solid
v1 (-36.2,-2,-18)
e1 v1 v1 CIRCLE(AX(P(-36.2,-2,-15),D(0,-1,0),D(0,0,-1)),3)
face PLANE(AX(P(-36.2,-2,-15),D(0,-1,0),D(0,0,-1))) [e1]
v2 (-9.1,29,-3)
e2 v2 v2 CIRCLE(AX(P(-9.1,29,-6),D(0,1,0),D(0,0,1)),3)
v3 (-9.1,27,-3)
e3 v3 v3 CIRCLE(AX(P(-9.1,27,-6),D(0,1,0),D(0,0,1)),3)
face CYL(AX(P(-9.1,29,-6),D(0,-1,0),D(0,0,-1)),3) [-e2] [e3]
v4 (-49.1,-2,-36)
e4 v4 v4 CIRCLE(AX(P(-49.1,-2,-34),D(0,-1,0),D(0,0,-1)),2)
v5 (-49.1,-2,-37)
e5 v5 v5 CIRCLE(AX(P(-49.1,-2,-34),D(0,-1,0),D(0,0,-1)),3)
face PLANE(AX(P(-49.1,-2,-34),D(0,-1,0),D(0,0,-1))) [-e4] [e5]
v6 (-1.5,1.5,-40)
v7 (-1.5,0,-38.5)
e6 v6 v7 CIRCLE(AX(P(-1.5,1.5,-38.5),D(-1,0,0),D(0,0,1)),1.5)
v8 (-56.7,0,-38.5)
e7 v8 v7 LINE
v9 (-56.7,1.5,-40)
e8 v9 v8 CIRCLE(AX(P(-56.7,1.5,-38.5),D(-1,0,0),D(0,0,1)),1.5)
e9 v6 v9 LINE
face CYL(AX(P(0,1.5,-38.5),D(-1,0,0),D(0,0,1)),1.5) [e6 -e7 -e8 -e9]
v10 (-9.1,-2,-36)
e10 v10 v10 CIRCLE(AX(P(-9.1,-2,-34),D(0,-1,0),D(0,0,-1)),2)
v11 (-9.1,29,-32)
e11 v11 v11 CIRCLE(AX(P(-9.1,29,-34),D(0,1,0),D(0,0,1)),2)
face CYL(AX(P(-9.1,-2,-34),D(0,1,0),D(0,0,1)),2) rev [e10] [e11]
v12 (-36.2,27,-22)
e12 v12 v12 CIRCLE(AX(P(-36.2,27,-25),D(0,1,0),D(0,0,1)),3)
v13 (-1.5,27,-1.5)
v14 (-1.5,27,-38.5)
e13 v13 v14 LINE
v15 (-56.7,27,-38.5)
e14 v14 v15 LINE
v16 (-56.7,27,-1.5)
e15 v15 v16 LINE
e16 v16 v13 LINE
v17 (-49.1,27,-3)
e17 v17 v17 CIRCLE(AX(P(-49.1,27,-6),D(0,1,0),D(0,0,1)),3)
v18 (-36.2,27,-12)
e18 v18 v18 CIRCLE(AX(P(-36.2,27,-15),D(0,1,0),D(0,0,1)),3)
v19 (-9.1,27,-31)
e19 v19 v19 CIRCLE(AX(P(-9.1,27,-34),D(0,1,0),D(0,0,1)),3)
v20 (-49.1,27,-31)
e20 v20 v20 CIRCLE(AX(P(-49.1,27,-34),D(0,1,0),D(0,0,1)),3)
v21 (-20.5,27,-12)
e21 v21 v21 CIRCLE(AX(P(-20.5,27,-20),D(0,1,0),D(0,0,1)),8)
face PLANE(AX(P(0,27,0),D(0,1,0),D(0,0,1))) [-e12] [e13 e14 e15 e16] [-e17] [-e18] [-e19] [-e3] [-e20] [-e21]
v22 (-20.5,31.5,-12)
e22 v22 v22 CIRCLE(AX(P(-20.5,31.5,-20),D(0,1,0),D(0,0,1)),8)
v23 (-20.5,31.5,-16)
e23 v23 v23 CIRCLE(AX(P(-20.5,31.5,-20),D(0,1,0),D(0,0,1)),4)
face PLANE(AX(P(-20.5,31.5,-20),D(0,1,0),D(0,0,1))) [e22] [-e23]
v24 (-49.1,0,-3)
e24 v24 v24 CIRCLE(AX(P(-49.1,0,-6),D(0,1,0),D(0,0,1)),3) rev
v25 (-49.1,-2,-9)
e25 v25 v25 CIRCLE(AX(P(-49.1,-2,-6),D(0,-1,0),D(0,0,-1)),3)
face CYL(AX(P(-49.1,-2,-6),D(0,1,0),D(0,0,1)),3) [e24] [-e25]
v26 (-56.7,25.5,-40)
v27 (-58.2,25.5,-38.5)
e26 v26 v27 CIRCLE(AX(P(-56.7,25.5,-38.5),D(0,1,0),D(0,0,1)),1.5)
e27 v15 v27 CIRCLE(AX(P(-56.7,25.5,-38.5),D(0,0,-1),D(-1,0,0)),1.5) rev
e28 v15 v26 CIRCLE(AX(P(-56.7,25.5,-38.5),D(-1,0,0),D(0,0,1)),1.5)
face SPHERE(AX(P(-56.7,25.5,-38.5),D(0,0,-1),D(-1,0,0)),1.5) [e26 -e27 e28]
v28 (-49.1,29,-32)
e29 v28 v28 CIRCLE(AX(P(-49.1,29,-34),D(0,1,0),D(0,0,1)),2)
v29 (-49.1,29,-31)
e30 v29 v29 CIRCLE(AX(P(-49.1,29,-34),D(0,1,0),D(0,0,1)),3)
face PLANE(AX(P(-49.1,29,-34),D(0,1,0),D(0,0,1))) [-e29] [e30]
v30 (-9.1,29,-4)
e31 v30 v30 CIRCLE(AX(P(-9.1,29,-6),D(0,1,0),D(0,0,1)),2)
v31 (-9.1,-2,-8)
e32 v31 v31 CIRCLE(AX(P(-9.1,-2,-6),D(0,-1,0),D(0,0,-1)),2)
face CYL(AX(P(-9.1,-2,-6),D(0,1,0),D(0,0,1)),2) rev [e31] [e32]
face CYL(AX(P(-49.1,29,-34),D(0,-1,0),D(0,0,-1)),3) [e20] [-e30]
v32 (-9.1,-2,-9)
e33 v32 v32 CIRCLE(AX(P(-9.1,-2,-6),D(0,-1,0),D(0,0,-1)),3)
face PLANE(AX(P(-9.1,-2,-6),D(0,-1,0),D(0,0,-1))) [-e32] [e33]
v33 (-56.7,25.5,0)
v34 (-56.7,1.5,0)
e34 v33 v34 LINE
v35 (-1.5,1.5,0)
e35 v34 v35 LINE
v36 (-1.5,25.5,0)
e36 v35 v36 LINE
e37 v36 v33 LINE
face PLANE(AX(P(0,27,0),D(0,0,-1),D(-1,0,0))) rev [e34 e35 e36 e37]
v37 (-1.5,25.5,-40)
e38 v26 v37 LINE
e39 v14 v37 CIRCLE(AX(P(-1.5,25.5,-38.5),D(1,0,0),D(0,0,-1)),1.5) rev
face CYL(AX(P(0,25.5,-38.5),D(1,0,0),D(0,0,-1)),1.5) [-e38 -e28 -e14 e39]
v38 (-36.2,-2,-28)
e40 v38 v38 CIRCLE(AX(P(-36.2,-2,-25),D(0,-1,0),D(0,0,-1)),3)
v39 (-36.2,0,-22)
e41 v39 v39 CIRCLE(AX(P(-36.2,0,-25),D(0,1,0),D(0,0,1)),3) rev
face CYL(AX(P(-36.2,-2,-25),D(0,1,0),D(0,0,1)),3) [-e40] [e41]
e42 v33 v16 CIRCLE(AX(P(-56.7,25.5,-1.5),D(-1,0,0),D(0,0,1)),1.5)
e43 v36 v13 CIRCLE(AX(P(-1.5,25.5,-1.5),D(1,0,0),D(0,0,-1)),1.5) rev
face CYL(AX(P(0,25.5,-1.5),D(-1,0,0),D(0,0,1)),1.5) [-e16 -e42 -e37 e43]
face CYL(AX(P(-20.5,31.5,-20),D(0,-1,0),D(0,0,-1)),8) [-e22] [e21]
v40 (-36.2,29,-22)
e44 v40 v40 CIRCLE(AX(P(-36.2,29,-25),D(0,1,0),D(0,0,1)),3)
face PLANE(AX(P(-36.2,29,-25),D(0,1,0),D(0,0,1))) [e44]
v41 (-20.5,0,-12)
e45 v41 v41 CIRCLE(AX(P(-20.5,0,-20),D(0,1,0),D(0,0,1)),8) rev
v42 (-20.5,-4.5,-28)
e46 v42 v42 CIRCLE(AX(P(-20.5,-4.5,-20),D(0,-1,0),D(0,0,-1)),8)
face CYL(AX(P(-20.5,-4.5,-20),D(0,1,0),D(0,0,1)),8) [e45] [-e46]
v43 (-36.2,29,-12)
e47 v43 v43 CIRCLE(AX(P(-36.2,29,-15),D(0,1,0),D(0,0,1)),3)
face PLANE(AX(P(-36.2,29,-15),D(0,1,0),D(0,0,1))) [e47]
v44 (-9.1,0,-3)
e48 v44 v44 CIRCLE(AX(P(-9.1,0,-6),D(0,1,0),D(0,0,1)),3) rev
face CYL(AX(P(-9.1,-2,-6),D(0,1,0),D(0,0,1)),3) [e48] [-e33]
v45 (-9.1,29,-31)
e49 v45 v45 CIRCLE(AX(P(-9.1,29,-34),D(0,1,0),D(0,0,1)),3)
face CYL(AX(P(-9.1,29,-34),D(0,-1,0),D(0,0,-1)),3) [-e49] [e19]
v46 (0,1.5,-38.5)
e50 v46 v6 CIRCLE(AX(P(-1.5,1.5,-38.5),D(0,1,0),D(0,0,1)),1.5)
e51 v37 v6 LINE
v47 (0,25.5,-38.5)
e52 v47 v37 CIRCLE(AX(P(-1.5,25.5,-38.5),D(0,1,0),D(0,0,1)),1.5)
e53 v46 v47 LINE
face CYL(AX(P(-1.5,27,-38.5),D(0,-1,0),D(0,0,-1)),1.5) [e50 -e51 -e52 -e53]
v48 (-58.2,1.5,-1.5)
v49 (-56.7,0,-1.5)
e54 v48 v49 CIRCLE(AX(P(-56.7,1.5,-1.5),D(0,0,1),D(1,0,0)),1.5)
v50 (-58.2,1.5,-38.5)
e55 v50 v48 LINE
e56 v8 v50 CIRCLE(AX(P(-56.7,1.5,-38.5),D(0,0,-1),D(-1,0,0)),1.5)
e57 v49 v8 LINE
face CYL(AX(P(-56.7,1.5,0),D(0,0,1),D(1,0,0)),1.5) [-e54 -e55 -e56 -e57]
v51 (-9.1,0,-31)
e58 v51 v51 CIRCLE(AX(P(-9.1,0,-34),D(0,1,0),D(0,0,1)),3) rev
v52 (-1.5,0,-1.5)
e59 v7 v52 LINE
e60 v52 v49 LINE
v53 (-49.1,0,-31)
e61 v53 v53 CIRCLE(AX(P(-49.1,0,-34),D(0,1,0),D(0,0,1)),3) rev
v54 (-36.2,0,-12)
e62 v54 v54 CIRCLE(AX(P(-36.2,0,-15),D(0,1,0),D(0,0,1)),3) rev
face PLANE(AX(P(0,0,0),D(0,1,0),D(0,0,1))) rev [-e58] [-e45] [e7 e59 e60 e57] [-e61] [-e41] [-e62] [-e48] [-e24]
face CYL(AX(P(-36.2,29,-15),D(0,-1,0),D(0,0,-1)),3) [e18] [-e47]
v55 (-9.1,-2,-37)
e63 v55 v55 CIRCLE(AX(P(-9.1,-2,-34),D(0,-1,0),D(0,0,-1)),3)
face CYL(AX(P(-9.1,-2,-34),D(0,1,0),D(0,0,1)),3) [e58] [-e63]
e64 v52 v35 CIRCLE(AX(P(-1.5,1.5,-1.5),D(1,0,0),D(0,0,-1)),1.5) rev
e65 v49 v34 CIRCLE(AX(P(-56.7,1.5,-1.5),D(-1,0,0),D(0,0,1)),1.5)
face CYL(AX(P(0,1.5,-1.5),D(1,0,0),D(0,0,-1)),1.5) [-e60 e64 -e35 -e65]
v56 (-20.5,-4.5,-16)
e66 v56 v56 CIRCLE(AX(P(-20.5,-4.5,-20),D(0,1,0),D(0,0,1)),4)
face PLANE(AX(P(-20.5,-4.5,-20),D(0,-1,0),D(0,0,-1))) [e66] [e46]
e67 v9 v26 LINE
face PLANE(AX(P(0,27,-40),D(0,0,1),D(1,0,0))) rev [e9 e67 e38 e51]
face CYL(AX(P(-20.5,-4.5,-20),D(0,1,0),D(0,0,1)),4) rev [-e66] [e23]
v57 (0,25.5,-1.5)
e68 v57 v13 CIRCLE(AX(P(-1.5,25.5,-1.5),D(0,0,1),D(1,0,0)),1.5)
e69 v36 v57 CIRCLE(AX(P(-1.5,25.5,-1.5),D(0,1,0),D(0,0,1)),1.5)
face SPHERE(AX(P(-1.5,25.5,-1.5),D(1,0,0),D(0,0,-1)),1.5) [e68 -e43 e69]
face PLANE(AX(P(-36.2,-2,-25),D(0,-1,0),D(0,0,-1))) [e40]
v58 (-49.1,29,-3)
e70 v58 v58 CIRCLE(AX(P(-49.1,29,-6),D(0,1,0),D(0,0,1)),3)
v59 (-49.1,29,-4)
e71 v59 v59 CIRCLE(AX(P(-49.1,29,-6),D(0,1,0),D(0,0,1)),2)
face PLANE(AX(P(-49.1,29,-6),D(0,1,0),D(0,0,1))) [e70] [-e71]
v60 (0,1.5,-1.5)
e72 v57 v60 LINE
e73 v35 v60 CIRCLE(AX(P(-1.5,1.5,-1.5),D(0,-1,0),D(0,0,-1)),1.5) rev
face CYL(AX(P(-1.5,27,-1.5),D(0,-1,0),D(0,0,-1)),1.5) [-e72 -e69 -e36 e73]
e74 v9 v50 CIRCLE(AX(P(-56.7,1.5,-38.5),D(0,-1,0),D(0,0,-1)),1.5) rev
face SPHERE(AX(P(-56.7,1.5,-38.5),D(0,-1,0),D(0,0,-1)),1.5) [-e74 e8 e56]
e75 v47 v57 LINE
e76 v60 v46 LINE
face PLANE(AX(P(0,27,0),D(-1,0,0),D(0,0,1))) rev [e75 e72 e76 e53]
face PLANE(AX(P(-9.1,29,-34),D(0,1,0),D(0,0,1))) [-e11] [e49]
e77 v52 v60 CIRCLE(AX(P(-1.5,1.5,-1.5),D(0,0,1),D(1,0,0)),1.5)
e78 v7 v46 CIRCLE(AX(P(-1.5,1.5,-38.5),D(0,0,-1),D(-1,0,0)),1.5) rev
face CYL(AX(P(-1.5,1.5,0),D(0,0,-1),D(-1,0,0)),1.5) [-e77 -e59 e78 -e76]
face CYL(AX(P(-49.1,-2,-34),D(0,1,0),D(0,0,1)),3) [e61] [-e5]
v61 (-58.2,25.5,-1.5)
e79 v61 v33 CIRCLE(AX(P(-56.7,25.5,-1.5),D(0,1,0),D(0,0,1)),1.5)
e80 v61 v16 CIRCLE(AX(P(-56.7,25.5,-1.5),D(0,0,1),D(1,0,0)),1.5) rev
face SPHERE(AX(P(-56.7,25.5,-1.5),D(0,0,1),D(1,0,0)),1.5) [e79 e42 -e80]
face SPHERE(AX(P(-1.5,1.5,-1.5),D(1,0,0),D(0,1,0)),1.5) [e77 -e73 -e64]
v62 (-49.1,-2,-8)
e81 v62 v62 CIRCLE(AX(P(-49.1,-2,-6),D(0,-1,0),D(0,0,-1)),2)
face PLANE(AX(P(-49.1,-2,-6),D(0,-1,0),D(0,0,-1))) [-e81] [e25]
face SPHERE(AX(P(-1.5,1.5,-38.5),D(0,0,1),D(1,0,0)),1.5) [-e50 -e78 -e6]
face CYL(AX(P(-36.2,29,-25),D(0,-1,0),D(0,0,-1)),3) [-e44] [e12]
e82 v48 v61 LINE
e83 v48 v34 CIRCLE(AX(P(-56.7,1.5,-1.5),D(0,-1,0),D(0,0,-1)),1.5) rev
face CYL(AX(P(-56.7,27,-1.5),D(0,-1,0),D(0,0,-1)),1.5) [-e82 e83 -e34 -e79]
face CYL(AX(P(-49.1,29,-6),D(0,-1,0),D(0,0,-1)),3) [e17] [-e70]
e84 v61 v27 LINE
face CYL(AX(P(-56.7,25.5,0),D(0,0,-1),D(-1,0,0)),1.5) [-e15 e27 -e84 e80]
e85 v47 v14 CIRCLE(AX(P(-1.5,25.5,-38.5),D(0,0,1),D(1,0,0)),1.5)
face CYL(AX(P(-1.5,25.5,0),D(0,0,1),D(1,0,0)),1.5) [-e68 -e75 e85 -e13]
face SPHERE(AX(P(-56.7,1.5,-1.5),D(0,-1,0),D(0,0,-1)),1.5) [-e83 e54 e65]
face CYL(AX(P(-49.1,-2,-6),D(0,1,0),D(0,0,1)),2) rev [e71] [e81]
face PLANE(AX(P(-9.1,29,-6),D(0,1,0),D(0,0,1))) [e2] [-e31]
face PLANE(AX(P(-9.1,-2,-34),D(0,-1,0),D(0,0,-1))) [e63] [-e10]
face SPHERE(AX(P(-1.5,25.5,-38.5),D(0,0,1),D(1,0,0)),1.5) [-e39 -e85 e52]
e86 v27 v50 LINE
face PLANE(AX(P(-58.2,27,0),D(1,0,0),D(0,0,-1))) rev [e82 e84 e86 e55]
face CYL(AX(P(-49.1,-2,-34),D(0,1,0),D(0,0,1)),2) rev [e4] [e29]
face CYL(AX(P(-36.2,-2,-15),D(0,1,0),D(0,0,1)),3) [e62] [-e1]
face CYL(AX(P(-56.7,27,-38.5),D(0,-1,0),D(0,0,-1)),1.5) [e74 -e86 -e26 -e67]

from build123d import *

# Parameters (mm, degrees)
SKETCH1_W            = 58.2
SKETCH1_H            = 40
BOSS_EXTRUDE1_DEPTH  = 27
SKETCH2_R            = 3
BOSS_EXTRUDE2_DEPTH  = 2
SKETCH3_R            = 2
CUT_EXTRUDE1_DEPTH   = 31
SKETCH4_R            = 3
BOSS_EXTRUDE3_DEPTH  = 2
SKETCH5_R            = 2
CUT_EXTRUDE2_DEPTH   = 31
SKETCH6_R            = 3
BOSS_EXTRUDE4_DEPTH  = 2
SKETCH7_R            = 2
CUT_EXTRUDE3_DEPTH   = 31
SKETCH8_R            = 3
BOSS_EXTRUDE5_DEPTH  = 2
SKETCH9_R            = 2
CUT_EXTRUDE4_DEPTH   = 31
SKETCH10_R           = 8
BOSS_EXTRUDE6_DEPTH  = 4.5
SKETCH11_R           = 4
CUT_EXTRUDE5_DEPTH   = 36
BOSS_EXTRUDE7_START  = 2
SKETCH12_R           = 3
BOSS_EXTRUDE7_DEPTH  = 2
BOSS_EXTRUDE8_START  = 2
SKETCH13_R           = 3
BOSS_EXTRUDE8_DEPTH  = 2
BOSS_EXTRUDE9_START  = 4.5
SKETCH15_R           = 8
BOSS_EXTRUDE9_DEPTH  = 4.5
SKETCH18_R           = 2
CUT_EXTRUDE11_DEPTH  = 78.32716211
SKETCH19_R           = 4
CUT_EXTRUDE12_DEPTH  = 78.32716211
SKETCH20_R           = 2
CUT_EXTRUDE13_DEPTH  = 78.32716211
SKETCH24_R           = 3
BOSS_EXTRUDE11_DEPTH = 2
SKETCH25_R           = 3
BOSS_EXTRUDE12_DEPTH = 2
BOSS_EXTRUDE13_START = 2
SKETCH26_R           = 3
BOSS_EXTRUDE13_DEPTH = 2
BOSS_EXTRUDE14_START = 2
SKETCH27_R           = 3
BOSS_EXTRUDE14_DEPTH = 2
FILLET5_R            = 1.5
FILLET6_R            = 1.5


with BuildPart() as part:
    # Sketch1 → Boss-Extrude1 (new body)
    with BuildSketch(Plane(origin=(0, 0, 0), x_dir=(1, 0, 0), z_dir=(0, 1, 0))):
        with Locations((-29.1, 20)):
            Rectangle(SKETCH1_W, SKETCH1_H)
    extrude(amount=BOSS_EXTRUDE1_DEPTH)

    # Sketch2 → Boss-Extrude2 (add)
    with BuildSketch(Plane(origin=(0, 27, 0), x_dir=(1, 0, 0), z_dir=(0, 1, 0))):
        with Locations(Location((-49.1, 34, 0), (0, 0, 270))):
            Circle(SKETCH2_R)
    extrude(amount=BOSS_EXTRUDE2_DEPTH)

    # Sketch3 → Cut-Extrude1 (cut)
    with BuildSketch(Plane(origin=(0, 29, 0), x_dir=(1, 0, 0), z_dir=(0, 1, 0))):
        with Locations(Location((-49.1, 34, 0), (0, 0, 270))):
            Circle(SKETCH3_R)
    extrude(amount=-CUT_EXTRUDE1_DEPTH, mode=Mode.SUBTRACT)

    # Sketch4 → Boss-Extrude3 (add)
    with BuildSketch(Plane(origin=(0, 27, 0), x_dir=(1, 0, 0), z_dir=(0, 1, 0))):
        with Locations(Location((-9.1, 34, 0), (0, 0, 270))):
            Circle(SKETCH4_R)
    extrude(amount=BOSS_EXTRUDE3_DEPTH)

    # Sketch5 → Cut-Extrude2 (cut)
    with BuildSketch(Plane(origin=(0, 29, 0), x_dir=(1, 0, 0), z_dir=(0, 1, 0))):
        with Locations(Location((-9.1, 34, 0), (0, 0, 270))):
            Circle(SKETCH5_R)
    extrude(amount=-CUT_EXTRUDE2_DEPTH, mode=Mode.SUBTRACT)

    # Sketch6 → Boss-Extrude4 (add)
    with BuildSketch(Plane(origin=(0, 27, 0), x_dir=(1, 0, 0), z_dir=(0, 1, 0))):
        with Locations(Location((-49.1, 6, 0), (0, 0, 270))):
            Circle(SKETCH6_R)
    extrude(amount=BOSS_EXTRUDE4_DEPTH)

    # Sketch7 → Cut-Extrude3 (cut)
    with BuildSketch(Plane(origin=(0, 29, 0), x_dir=(1, 0, 0), z_dir=(0, 1, 0))):
        with Locations(Location((-49.1, 6, 0), (0, 0, 270))):
            Circle(SKETCH7_R)
    extrude(amount=-CUT_EXTRUDE3_DEPTH, mode=Mode.SUBTRACT)

    # Sketch8 → Boss-Extrude5 (add)
    with BuildSketch(Plane(origin=(0, 27, 0), x_dir=(1, 0, 0), z_dir=(0, 1, 0))):
        with Locations(Location((-9.1, 6, 0), (0, 0, 270))):
            Circle(SKETCH8_R)
    extrude(amount=BOSS_EXTRUDE5_DEPTH)

    # Sketch9 → Cut-Extrude4 (cut)
    with BuildSketch(Plane(origin=(0, 29, 0), x_dir=(1, 0, 0), z_dir=(0, 1, 0))):
        with Locations(Location((-9.1, 6, 0), (0, 0, 270))):
            Circle(SKETCH9_R)
    extrude(amount=-CUT_EXTRUDE4_DEPTH, mode=Mode.SUBTRACT)

    # Sketch10 → Boss-Extrude6 (add)
    with BuildSketch(Plane(origin=(0, 27, 0), x_dir=(1, 0, 0), z_dir=(0, 1, 0))):
        with Locations(Location((-20.5, 20, 0), (0, 0, 270))):
            Circle(SKETCH10_R)
    extrude(amount=BOSS_EXTRUDE6_DEPTH)

    # Sketch11 → Cut-Extrude5 (cut)
    with BuildSketch(Plane(origin=(0, 31.5, 0), x_dir=(1, 0, 0), z_dir=(0, 1, 0))):
        with Locations(Location((-20.5, 20, 0), (0, 0, 270))):
            Circle(SKETCH11_R)
    extrude(amount=-CUT_EXTRUDE5_DEPTH, mode=Mode.SUBTRACT)

    # Sketch12 → Boss-Extrude7 (add)
    with BuildSketch(Plane.XZ.offset(BOSS_EXTRUDE7_START)):
        with Locations(Location((-49.1, -6, 0), (0, 0, 90))):
            Circle(SKETCH12_R)
    extrude(amount=-BOSS_EXTRUDE7_DEPTH)

    # Sketch13 → Boss-Extrude8 (add)
    with BuildSketch(Plane.XZ.offset(BOSS_EXTRUDE8_START)):
        with Locations(Location((-49.1, -34, 0), (0, 0, 90))):
            Circle(SKETCH13_R)
        with Locations(Location((-9.1, -6, 0), (0, 0, 90))):
            Circle(SKETCH13_R)
        with Locations(Location((-9.1, -34, 0), (0, 0, 90))):
            Circle(SKETCH13_R)
    extrude(amount=-BOSS_EXTRUDE8_DEPTH)

    # Sketch15 → Boss-Extrude9 (add)
    with BuildSketch(Plane.XZ.offset(BOSS_EXTRUDE9_START)):
        with Locations(Location((-20.5, -20, 0), (0, 0, 90))):
            Circle(SKETCH15_R)
    extrude(amount=-BOSS_EXTRUDE9_DEPTH)

    # Sketch18 → Cut-Extrude11 (cut, through all)
    with BuildSketch(Plane(origin=(0, 0, 0), x_dir=(1, 0, 0), z_dir=(0, 1, 0))):
        with Locations(Location((-9.1, 6, 0), (0, 0, 270))):
            Circle(SKETCH18_R)
    extrude(amount=-CUT_EXTRUDE11_DEPTH, mode=Mode.SUBTRACT)

    # Sketch19 → Cut-Extrude12 (cut, through all)
    with BuildSketch(Plane(origin=(0, 0, 0), x_dir=(1, 0, 0), z_dir=(0, 1, 0))):
        with Locations(Location((-20.5, 20, 0), (0, 0, 270))):
            Circle(SKETCH19_R)
    extrude(amount=-CUT_EXTRUDE12_DEPTH, mode=Mode.SUBTRACT)

    # Sketch20 → Cut-Extrude13 (cut, through all)
    with BuildSketch(Plane(origin=(0, 0, 0), x_dir=(1, 0, 0), z_dir=(0, 1, 0))):
        with Locations(Location((-49.1, 34, 0), (0, 0, 270))):
            Circle(SKETCH20_R)
        with Locations(Location((-49.1, 6, 0), (0, 0, 270))):
            Circle(SKETCH20_R)
        with Locations(Location((-9.1, 34, 0), (0, 0, 270))):
            Circle(SKETCH20_R)
    extrude(amount=-CUT_EXTRUDE13_DEPTH, mode=Mode.SUBTRACT)

    # Sketch24 → Boss-Extrude11 (add)
    with BuildSketch(Plane(origin=(0, 27, 0), x_dir=(1, 0, 0), z_dir=(0, 1, 0))):
        with Locations(Location((-36.2, 15, 0), (0, 0, 270))):
            Circle(SKETCH24_R)
    extrude(amount=BOSS_EXTRUDE11_DEPTH)

    # Sketch25 → Boss-Extrude12 (add)
    with BuildSketch(Plane(origin=(0, 27, 0), x_dir=(1, 0, 0), z_dir=(0, 1, 0))):
        with Locations(Location((-36.2, 25, 0), (0, 0, 270))):
            Circle(SKETCH25_R)
    extrude(amount=BOSS_EXTRUDE12_DEPTH)

    # Sketch26 → Boss-Extrude13 (add)
    with BuildSketch(Plane.XZ.offset(BOSS_EXTRUDE13_START)):
        with Locations(Location((-36.2, -15, 0), (0, 0, 90))):
            Circle(SKETCH26_R)
    extrude(amount=-BOSS_EXTRUDE13_DEPTH)

    # Sketch27 → Boss-Extrude14 (add)
    with BuildSketch(Plane.XZ.offset(BOSS_EXTRUDE14_START)):
        with Locations(Location((-36.2, -25, 0), (0, 0, 90))):
            Circle(SKETCH27_R)
    extrude(amount=-BOSS_EXTRUDE14_DEPTH)

    # Fillet5
    fillet5_edges = [part.edges().sort_by_distance(p)[0] for p in [
        (-58.2, 27, -20),
        (-29.1, 27, 0),
        (0, 27, -20),
        (-29.1, 0, 0),
        (-58.2, 0, -20),
        (-29.1, 0, -40),
        (0, 0, -20),
        (0, 13.5, 0),
        (-58.2, 13.5, 0),
        (-58.2, 13.5, -40),
        (-29.1, 27, -40),
    ]]
    fillet(fillet5_edges, radius=FILLET5_R)

    # Fillet6
    # the kernel refuses this fillet: 1.5 mm, written as the material it takes off along each edge
    with BuildSketch(Plane(origin=(-1.5, 1.5, -38.5), x_dir=(0, 0, -1), z_dir=(1, 0, 0))) as fillet6_piece_1_section:
        Polygon((0, 0), (FILLET6_R, 0), (FILLET6_R, -FILLET6_R), (0, -FILLET6_R), align=None)
    fillet6_piece_1 = extrude(amount=FILLET6_R, mode=Mode.PRIVATE)
    fillet6_piece_1 = fillet6_piece_1 - Plane(origin=(-1.5, 1.5, -38.5), x_dir=(0, 0.7071067811865475, 0.7071067811865475), z_dir=(1, 0, 0)) * Sphere(FILLET6_R, mode=Mode.PRIVATE)
    add(fillet6_piece_1, mode=Mode.SUBTRACT)
    with BuildSketch(Plane(origin=(-1.5, 25.5, -38.5), x_dir=(0, 0, -1), z_dir=(1, 0, 0))) as fillet6_piece_2_section:
        Polygon((0, 0), (FILLET6_R, 0), (FILLET6_R, FILLET6_R), (0, FILLET6_R), align=None)
    fillet6_piece_2 = extrude(amount=FILLET6_R, mode=Mode.PRIVATE)
    fillet6_piece_2 = fillet6_piece_2 - Plane(origin=(-1.5, 25.5, -38.5), x_dir=(0, -0.7071067811865475, 0.7071067811865475), z_dir=(1, 0, 0)) * Sphere(FILLET6_R, mode=Mode.PRIVATE)
    add(fillet6_piece_2, mode=Mode.SUBTRACT)
    with BuildSketch(Plane(origin=(0, 1.5, -40), x_dir=(0, 0, 1), z_dir=(0, 1, 0))) as fillet6_piece_3:
        with BuildLine():
            CenterArc((FILLET6_R, -FILLET6_R), FILLET6_R, 90, 90)
            Line((0, -FILLET6_R), (0, 0))
            Line((0, 0), (FILLET6_R, 0))
        make_face()
    extrude(amount=24, mode=Mode.SUBTRACT)


solid = part.part
